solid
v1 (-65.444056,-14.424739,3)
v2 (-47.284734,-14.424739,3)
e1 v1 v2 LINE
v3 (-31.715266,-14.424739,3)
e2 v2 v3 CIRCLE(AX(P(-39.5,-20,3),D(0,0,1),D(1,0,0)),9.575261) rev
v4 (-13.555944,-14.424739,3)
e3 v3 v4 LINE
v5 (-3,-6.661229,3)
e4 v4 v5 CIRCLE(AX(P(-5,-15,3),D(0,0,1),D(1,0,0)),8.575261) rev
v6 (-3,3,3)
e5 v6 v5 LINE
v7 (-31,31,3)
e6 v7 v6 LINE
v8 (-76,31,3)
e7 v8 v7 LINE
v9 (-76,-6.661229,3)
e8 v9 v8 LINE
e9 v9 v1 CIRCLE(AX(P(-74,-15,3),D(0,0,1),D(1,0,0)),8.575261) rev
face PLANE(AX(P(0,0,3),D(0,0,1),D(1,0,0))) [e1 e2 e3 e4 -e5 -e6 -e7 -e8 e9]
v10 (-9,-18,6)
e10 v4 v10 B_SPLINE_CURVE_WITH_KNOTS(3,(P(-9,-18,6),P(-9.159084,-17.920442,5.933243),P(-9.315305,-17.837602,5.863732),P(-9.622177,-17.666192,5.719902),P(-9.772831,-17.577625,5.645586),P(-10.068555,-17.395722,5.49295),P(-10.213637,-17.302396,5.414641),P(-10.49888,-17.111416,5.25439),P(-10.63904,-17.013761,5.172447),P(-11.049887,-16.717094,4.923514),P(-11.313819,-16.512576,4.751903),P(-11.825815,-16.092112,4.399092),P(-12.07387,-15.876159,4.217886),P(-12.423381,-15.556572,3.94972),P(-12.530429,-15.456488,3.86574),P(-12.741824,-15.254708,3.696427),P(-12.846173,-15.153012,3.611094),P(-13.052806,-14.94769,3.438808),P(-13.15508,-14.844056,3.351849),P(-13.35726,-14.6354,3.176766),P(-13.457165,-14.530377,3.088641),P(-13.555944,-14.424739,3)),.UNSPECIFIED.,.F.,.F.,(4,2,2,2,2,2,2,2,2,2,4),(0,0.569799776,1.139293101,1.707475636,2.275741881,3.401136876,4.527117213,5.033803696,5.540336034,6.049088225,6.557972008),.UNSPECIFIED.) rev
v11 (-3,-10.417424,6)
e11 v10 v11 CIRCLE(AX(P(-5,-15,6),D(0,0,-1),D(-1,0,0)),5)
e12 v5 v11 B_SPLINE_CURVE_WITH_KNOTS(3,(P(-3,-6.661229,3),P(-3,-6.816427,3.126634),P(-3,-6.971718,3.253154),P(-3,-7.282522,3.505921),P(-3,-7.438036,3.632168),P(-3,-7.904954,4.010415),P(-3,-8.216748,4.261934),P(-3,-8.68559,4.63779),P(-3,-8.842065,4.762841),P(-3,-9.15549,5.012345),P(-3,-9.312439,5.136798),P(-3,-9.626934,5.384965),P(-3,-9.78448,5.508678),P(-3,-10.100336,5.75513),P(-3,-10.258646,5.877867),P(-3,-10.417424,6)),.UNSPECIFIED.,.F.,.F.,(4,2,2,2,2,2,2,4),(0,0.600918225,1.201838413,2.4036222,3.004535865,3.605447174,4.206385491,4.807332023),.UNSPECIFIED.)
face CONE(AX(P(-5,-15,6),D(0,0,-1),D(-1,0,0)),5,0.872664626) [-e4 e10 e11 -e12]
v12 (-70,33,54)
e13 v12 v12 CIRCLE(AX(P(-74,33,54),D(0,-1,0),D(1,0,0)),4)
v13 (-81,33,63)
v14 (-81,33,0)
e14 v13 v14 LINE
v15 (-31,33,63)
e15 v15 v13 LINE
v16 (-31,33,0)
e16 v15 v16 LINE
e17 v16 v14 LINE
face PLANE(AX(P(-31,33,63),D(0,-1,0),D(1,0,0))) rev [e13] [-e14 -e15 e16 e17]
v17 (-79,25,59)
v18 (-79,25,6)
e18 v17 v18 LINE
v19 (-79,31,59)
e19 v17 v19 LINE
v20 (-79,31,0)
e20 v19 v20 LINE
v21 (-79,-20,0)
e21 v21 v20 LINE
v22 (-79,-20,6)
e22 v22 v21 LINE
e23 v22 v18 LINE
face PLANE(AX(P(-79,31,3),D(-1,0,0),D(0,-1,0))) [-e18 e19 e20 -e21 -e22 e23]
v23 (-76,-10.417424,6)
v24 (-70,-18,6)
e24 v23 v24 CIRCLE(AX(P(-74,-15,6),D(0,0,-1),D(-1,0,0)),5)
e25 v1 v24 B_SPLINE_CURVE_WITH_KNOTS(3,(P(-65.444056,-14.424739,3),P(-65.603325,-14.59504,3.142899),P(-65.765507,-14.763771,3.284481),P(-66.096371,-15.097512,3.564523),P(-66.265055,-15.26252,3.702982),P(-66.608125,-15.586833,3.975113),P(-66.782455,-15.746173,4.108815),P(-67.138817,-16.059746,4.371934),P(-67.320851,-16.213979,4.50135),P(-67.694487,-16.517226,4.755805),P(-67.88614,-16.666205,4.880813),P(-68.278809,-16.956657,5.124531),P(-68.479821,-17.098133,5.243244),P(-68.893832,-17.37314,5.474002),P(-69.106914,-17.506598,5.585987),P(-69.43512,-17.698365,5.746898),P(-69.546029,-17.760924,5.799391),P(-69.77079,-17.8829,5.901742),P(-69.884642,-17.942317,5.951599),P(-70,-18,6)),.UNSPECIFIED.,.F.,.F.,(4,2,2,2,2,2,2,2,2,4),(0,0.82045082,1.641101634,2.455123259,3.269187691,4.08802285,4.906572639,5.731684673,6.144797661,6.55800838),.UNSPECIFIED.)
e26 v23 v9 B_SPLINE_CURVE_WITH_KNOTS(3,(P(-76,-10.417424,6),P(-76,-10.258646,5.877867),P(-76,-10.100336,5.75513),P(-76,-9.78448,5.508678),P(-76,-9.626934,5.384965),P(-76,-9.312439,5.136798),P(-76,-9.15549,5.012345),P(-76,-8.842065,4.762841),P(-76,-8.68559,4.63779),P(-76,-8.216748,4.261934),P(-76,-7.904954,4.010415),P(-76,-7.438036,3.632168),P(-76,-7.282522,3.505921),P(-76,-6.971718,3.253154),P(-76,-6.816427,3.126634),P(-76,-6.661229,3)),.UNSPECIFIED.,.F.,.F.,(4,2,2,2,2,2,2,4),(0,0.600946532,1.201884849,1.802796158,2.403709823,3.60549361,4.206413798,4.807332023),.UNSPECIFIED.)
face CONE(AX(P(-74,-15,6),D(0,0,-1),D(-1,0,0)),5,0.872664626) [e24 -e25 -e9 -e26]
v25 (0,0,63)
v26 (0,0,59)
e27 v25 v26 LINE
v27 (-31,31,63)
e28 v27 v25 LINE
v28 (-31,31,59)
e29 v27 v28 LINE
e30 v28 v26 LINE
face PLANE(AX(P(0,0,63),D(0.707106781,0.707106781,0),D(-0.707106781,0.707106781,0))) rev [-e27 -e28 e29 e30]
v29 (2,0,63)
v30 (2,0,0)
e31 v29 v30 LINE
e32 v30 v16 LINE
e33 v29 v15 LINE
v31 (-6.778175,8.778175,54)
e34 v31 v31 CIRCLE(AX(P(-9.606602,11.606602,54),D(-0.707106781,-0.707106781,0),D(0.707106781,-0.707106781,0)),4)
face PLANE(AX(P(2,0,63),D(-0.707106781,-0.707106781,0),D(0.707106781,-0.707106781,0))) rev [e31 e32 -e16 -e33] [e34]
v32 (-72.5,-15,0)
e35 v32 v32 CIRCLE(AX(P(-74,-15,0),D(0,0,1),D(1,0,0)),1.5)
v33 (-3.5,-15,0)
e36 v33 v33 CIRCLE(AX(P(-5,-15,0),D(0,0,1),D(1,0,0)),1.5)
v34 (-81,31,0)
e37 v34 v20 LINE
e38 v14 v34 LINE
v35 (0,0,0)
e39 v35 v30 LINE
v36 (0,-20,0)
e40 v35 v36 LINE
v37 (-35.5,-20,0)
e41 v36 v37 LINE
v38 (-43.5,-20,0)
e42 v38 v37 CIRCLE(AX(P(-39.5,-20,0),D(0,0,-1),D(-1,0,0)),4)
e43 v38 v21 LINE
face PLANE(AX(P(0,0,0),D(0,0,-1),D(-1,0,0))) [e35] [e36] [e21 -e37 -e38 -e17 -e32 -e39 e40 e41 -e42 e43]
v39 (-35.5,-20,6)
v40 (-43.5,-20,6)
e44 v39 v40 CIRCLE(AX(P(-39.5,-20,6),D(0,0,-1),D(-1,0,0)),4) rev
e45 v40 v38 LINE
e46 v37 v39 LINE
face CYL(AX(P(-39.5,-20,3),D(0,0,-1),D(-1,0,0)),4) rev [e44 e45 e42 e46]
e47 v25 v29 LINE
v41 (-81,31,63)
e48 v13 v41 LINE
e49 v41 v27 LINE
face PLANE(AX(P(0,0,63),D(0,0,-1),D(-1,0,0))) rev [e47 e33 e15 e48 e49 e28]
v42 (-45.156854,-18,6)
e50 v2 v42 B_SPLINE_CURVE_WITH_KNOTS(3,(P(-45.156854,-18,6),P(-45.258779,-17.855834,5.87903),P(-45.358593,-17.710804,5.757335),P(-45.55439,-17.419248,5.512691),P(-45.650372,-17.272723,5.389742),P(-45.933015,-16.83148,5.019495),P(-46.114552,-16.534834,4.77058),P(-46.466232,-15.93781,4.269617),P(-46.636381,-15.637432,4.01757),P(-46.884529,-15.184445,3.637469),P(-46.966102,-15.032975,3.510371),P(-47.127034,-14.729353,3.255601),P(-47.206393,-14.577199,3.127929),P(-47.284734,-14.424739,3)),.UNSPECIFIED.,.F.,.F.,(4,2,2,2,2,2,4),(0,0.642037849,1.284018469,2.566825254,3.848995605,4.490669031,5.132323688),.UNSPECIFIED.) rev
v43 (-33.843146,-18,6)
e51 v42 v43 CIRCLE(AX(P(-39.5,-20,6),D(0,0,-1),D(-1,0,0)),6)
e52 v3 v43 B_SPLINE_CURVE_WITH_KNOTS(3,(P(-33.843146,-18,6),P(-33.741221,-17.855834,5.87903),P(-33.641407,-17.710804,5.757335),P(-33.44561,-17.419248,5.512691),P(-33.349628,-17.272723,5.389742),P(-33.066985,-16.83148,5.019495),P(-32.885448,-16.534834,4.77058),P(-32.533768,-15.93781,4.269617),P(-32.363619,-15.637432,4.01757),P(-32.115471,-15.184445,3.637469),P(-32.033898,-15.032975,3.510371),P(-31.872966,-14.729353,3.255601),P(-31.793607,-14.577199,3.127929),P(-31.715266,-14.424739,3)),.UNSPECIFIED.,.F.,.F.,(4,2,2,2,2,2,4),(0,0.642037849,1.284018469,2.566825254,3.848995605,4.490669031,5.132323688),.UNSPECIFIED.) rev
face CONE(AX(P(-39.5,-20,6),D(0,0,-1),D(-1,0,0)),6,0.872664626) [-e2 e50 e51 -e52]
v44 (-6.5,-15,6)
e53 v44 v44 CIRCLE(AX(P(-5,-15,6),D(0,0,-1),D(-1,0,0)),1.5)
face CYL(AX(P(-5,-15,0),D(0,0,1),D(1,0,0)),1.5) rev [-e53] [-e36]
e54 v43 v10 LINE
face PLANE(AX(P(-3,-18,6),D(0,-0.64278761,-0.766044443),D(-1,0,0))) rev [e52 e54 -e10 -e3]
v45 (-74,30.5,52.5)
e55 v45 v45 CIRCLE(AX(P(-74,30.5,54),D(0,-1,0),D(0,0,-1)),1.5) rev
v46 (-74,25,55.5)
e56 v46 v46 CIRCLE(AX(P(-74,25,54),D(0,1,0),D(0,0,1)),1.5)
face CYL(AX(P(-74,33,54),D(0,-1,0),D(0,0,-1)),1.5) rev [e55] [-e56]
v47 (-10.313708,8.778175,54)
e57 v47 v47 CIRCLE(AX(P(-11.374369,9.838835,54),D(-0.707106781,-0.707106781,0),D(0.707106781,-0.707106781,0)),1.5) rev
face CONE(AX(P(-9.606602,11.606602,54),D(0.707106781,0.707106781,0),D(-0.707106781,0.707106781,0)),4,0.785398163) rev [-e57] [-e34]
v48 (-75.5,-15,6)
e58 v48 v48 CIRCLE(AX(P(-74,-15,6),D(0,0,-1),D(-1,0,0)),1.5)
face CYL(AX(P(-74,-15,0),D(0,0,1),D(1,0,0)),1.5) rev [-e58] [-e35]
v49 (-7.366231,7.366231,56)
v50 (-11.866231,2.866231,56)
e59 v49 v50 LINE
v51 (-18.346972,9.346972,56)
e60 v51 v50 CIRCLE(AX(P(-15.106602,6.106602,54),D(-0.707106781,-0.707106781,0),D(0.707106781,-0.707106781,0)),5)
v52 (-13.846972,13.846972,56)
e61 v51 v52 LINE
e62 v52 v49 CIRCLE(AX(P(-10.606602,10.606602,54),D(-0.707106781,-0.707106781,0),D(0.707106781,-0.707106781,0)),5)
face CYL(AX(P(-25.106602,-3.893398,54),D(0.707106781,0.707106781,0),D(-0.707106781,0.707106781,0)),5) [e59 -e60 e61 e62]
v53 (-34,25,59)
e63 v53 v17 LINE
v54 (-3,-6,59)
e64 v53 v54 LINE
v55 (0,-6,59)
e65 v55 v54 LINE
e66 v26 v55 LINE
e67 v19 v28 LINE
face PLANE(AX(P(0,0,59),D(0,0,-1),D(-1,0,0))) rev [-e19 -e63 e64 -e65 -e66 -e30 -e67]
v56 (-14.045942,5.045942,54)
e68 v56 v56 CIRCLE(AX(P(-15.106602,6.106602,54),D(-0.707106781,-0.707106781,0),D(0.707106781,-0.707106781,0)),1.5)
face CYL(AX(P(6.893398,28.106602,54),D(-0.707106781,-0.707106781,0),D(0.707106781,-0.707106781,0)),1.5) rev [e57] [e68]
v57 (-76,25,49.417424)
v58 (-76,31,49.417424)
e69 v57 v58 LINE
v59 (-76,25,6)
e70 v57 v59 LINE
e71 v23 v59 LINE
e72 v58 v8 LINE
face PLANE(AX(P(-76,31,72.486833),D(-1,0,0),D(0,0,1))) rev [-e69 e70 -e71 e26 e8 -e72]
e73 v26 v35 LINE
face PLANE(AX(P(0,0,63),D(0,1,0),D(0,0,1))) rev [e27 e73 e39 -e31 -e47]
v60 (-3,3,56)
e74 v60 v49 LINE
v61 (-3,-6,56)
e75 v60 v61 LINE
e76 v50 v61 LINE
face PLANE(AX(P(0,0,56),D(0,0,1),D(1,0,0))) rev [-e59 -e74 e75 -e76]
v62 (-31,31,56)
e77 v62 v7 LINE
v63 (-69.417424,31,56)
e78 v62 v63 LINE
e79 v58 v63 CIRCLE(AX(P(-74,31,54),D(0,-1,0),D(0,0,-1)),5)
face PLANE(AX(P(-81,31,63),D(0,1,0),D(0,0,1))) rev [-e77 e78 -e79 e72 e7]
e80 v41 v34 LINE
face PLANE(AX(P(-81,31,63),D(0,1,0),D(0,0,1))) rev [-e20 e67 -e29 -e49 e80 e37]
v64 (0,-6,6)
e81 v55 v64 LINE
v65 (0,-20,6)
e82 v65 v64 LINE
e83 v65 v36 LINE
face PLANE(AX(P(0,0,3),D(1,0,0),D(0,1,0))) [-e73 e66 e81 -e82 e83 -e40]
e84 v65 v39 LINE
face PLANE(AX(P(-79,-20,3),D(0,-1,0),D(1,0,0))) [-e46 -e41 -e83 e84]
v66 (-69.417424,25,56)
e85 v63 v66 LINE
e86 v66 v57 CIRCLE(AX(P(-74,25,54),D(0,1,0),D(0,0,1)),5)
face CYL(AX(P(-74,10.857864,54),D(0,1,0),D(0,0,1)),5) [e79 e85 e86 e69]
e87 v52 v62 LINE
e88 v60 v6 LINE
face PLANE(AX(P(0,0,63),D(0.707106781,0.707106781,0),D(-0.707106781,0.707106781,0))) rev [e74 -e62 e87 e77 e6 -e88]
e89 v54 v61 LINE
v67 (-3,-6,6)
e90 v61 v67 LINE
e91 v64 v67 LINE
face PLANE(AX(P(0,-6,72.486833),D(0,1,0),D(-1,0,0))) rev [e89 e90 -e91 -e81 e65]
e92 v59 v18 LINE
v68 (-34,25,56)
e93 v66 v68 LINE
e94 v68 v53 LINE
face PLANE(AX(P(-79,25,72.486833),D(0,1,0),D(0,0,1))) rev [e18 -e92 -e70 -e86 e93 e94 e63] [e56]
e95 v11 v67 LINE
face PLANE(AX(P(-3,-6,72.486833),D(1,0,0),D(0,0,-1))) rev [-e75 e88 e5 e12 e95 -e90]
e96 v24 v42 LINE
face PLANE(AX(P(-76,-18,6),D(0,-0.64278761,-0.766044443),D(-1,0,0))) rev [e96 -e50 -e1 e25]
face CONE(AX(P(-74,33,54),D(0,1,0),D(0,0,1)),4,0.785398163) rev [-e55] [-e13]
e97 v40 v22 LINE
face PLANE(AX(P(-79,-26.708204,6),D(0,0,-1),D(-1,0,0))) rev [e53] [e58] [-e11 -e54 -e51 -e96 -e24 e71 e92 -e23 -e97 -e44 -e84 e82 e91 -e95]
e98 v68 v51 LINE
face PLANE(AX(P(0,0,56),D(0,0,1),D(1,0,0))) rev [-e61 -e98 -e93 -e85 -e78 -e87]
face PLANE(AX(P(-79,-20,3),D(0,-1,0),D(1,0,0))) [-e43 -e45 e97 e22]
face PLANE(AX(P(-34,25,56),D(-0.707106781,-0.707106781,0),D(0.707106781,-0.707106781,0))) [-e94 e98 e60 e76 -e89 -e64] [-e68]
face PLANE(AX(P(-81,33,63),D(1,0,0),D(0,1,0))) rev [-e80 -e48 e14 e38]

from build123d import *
from OCP.BRepFilletAPI import BRepFilletAPI_MakeChamfer
from build123d.topology import SkipClean

# Parameters (mm, degrees)
EXTRUDE_1_DEPTH          = 63
EXTRUDE_2_DEPTH          = 3
SKETCH_3_W               = 3
SKETCH_3_H               = 6
EXTRUDE_3_DEPTH          = 56
EXTRUDE_4_DEPTH          = 3
SKETCH_6_W               = 3
SKETCH_6_H               = 6
EXTRUDE_5_DEPTH          = 45
SKETCH_7_W               = 3
SKETCH_7_H               = 6
EXTRUDE_6_DEPTH          = 14
SKETCH_8_R               = 4
CUT_EXTRUDE_1_DEPTH      = 3
EXTRUDE_7_DEPTH          = 3
SKETCH_10_R              = 5
EXTRUDE_8_DEPTH          = 3
SKETCH_12_R              = 5
EXTRUDE_9_DEPTH          = 6
CUT_EXTRUDE_3_DEPTH      = 113.049096382
CUT_EXTRUDE_3_DEPTH_BACK = 113.049096382
SKETCH_13_R              = 1.5
CHAMFER_2_SIZE           = 2.5
SKETCH_14_R              = 5
EXTRUDE_10_DEPTH         = 6.363961031
CUT_EXTRUDE_4_DEPTH      = 106.959898075
CUT_EXTRUDE_4_DEPTH_BACK = 106.959898075
SKETCH_15_R              = 1.5
CHAMFER_3_SIZE           = 2.5
CUT_EXTRUDE_5_DEPTH      = 105.398275848
CUT_EXTRUDE_5_DEPTH_BACK = 105.398275848
SKETCH_11_R              = 1.5
CHAMFER_4_SIZE           = 3
CHAMFER_4_SIZE_2         = 3.575260778


with BuildPart() as part:
    # Эскиз1 → Бобышка-Вытянуть1 (new body)
    with BuildSketch(Plane.XY):
        Polygon((0, 0), (-31, 31), (-81, 31), (-81, 33), (-31, 33), (2, 0), align=None)
    extrude(amount=EXTRUDE_1_DEPTH)

    # Эскиз2 → Бобышка-Вытянуть2 (add)
    with BuildSketch(Plane(origin=(0, 0, 0), x_dir=(-1, 0, 0), z_dir=(0, 0, -1))):
        Polygon((0, 0), (31, 31), (79, 31), (79, -20), (0, -20), align=None)
    extrude(amount=-EXTRUDE_2_DEPTH)

    # Эскиз3 → Бобышка-Вытянуть3 (add)
    with BuildSketch(Plane.XY.offset(3)):
        Polygon((0, 0), (0, -6), (-3, -6), (-3, 3), align=None)
        with Locations((-77.5, 28)):
            Rectangle(SKETCH_3_W, SKETCH_3_H)
    extrude(amount=EXTRUDE_3_DEPTH)

    # Эскиз5 → Бобышка-Вытянуть4 (add)
    with BuildSketch(Plane.XY.offset(59)):
        Polygon((-79, 25), (-76, 25), (-34, 25), (-3, -6), (0, -6), (0, 0), (-31, 31), (-79, 31), align=None)
    extrude(amount=-EXTRUDE_4_DEPTH)

    # Эскиз6 → Бобышка-Вытянуть5 (add)
    with BuildSketch(Plane.XZ.offset(-25)):
        with Locations((-77.5, 3)):
            Rectangle(SKETCH_6_W, SKETCH_6_H)
    extrude(amount=EXTRUDE_5_DEPTH)

    # Эскиз7 → Бобышка-Вытянуть6 (add)
    with BuildSketch(Plane.XZ.offset(6)):
        with Locations((-1.5, 3)):
            Rectangle(SKETCH_7_W, SKETCH_7_H)
    extrude(amount=EXTRUDE_6_DEPTH)

    # Эскиз8 → Вырез-Вытянуть1 (cut)
    with BuildSketch(Plane(origin=(0, 0, 0), x_dir=(-1, 0, 0), z_dir=(0, 0, -1))):
        with Locations((39.5, -20)):
            Circle(SKETCH_8_R)
    extrude(amount=-CUT_EXTRUDE_1_DEPTH, mode=Mode.SUBTRACT)

    # Эскиз9 → Бобышка-Вытянуть7 (add)
    with SkipClean():  # the faces are left unmerged after this step: merging them gives an invalid solid
        with BuildSketch(Plane.XY.offset(3)):
            with BuildLine():
                Line((-3, -20), (-35.5, -20))
                ThreePointArc((-35.5, -20), (-39.5, -16), (-43.5, -20))
                Line((-43.5, -20), (-76, -20))
                Line((-76, -20), (-76, -18))
                Line((-76, -18), (-45.156854249, -18))
                ThreePointArc((-45.156854249, -18), (-39.5, -14), (-33.843145751, -18))
                Line((-33.843145751, -18), (-3, -18))
                Line((-3, -18), (-3, -20))
            make_face()
        extrude(amount=EXTRUDE_7_DEPTH)
    add(part.part.scale(1), mode=Mode.REPLACE)  # the faces are merged on a copy

    # Эскиз10 → Бобышка-Вытянуть8 (add)
    with BuildSketch(Plane.XY.offset(3)):
        with Locations((-74, -15)):
            Circle(SKETCH_10_R)
        with Locations((-5, -15)):
            Circle(SKETCH_10_R)
    extrude(amount=EXTRUDE_8_DEPTH)

    # Эскиз12 → Бобышка-Вытянуть9 (add)
    with BuildSketch(Plane.XZ.offset(-31)):
        with Locations((-74, 54)):
            Circle(SKETCH_12_R)
    extrude(amount=EXTRUDE_9_DEPTH)

    # Эскиз13 → Вырез-Вытянуть3 (cut, two sides: drawn at the far end of the back side and taken through both)
    with BuildSketch(Plane.XZ.offset(-25).offset(-CUT_EXTRUDE_3_DEPTH_BACK)):
        with Locations(Location((-74, 54, 0), (0, 0, 270))):
            Circle(SKETCH_13_R)
    extrude(amount=CUT_EXTRUDE_3_DEPTH + CUT_EXTRUDE_3_DEPTH_BACK, mode=Mode.SUBTRACT)

    # Фаска2
    chamfer_2_edges = [part.edges().sort_by_distance(p)[0] for p in [
        (-74, 33, 55.5),
    ]]
    chamfer(chamfer_2_edges, length=CHAMFER_2_SIZE)

    # Эскиз14 → Бобышка-Вытянуть10 (add)
    with BuildSketch(Plane(origin=(0, 0, 0), x_dir=(0, 0, 1), z_dir=(-0.7071067811865462, -0.7071067811865489, 0))):
        with Locations((54, 15)):
            Circle(SKETCH_14_R)
    extrude(amount=EXTRUDE_10_DEPTH)

    # Эскиз15 → Вырез-Вытянуть4 (cut, two sides: drawn at the far end of the back side and taken through both)
    with BuildSketch(Plane(origin=(-4.5, -4.5, 0), x_dir=(0, 0, 1), z_dir=(-0.7071067811865464, -0.7071067811865488, 0)).offset(-CUT_EXTRUDE_4_DEPTH_BACK)):
        with Locations(Location((54, 15, 0), (0, 0, 270))):
            Circle(SKETCH_15_R)
    extrude(amount=CUT_EXTRUDE_4_DEPTH + CUT_EXTRUDE_4_DEPTH_BACK, mode=Mode.SUBTRACT)

    # Фаска3
    chamfer_3_edges = [part.edges().sort_by_distance(p)[0] for p in [
        (-10.66726189, 12.66726189, 54),
    ]]
    chamfer(chamfer_3_edges, length=CHAMFER_3_SIZE)

    # Эскиз11 → Вырез-Вытянуть5 (cut, two sides: drawn at the far end of the back side and taken through both)
    with BuildSketch(Plane.XY.offset(6).offset(-CUT_EXTRUDE_5_DEPTH_BACK)):
        with Locations((-74, -15)):
            Circle(SKETCH_11_R)
        with Locations((-5, -15)):
            Circle(SKETCH_11_R)
    extrude(amount=CUT_EXTRUDE_5_DEPTH + CUT_EXTRUDE_5_DEPTH_BACK, mode=Mode.SUBTRACT)

    # Фаска4
    chamfer_4_edges_1 = [part.edges().sort_by_distance(p)[0] for p in [
        (-8.920951867, -11.897398437, 3),
    ]]
    chamfer_4_side_1 = [part.faces().sort_by_distance(p)[0] for p in [
        (-8.920951867, -11.897398437, 3.06),
    ]]
    chamfer_4_edges_2 = [part.edges().sort_by_distance(p)[0] for p in [
        (-70.079048133, -11.897398437, 3),
    ]]
    chamfer_4_side_2 = [part.faces().sort_by_distance(p)[0] for p in [
        (-70.079048133, -11.897398437, 3.06),
    ]]
    chamfer_4_edges_3 = [part.edges().sort_by_distance(p)[0] for p in [
        (-21.421572875, -18, 3),
    ]]
    chamfer_4_side_3 = [part.faces().sort_by_distance(p)[0] for p in [
        (-21.421572875, -18, 3.06),
    ]]
    chamfer_4_edges_4 = [part.edges().sort_by_distance(p)[0] for p in [
        (-39.5, -14, 3),
    ]]
    chamfer_4_side_4 = [part.faces().sort_by_distance(p)[0] for p in [
        (-39.5, -14, 3.06),
    ]]
    chamfer_4_edges_5 = [part.edges().sort_by_distance(p)[0] for p in [
        (-57.578427125, -18, 3),
    ]]
    chamfer_4_side_5 = [part.faces().sort_by_distance(p)[0] for p in [
        (-57.578427125, -18, 3.06),
    ]]
    chamfer_4 = BRepFilletAPI_MakeChamfer(part.part.solid().wrapped)
    for e in chamfer_4_edges_1:
        chamfer_4.Add(CHAMFER_4_SIZE - 0.0001, CHAMFER_4_SIZE_2 - 0.0001, e.wrapped, chamfer_4_side_1[0].wrapped)
    for e in chamfer_4_edges_2:
        chamfer_4.Add(CHAMFER_4_SIZE - 0.0001, CHAMFER_4_SIZE_2 - 0.0001, e.wrapped, chamfer_4_side_2[0].wrapped)
    for e in chamfer_4_edges_3:
        chamfer_4.Add(CHAMFER_4_SIZE - 0.0001, CHAMFER_4_SIZE_2 - 0.0001, e.wrapped, chamfer_4_side_3[0].wrapped)
    for e in chamfer_4_edges_4:
        chamfer_4.Add(CHAMFER_4_SIZE - 0.0001, CHAMFER_4_SIZE_2 - 0.0001, e.wrapped, chamfer_4_side_4[0].wrapped)
    for e in chamfer_4_edges_5:
        chamfer_4.Add(CHAMFER_4_SIZE - 0.0001, CHAMFER_4_SIZE_2 - 0.0001, e.wrapped, chamfer_4_side_5[0].wrapped)
    add(Compound.cast(chamfer_4.Shape()), mode=Mode.REPLACE)  # a hair under: the kernel refuses the full size


solid = part.part
